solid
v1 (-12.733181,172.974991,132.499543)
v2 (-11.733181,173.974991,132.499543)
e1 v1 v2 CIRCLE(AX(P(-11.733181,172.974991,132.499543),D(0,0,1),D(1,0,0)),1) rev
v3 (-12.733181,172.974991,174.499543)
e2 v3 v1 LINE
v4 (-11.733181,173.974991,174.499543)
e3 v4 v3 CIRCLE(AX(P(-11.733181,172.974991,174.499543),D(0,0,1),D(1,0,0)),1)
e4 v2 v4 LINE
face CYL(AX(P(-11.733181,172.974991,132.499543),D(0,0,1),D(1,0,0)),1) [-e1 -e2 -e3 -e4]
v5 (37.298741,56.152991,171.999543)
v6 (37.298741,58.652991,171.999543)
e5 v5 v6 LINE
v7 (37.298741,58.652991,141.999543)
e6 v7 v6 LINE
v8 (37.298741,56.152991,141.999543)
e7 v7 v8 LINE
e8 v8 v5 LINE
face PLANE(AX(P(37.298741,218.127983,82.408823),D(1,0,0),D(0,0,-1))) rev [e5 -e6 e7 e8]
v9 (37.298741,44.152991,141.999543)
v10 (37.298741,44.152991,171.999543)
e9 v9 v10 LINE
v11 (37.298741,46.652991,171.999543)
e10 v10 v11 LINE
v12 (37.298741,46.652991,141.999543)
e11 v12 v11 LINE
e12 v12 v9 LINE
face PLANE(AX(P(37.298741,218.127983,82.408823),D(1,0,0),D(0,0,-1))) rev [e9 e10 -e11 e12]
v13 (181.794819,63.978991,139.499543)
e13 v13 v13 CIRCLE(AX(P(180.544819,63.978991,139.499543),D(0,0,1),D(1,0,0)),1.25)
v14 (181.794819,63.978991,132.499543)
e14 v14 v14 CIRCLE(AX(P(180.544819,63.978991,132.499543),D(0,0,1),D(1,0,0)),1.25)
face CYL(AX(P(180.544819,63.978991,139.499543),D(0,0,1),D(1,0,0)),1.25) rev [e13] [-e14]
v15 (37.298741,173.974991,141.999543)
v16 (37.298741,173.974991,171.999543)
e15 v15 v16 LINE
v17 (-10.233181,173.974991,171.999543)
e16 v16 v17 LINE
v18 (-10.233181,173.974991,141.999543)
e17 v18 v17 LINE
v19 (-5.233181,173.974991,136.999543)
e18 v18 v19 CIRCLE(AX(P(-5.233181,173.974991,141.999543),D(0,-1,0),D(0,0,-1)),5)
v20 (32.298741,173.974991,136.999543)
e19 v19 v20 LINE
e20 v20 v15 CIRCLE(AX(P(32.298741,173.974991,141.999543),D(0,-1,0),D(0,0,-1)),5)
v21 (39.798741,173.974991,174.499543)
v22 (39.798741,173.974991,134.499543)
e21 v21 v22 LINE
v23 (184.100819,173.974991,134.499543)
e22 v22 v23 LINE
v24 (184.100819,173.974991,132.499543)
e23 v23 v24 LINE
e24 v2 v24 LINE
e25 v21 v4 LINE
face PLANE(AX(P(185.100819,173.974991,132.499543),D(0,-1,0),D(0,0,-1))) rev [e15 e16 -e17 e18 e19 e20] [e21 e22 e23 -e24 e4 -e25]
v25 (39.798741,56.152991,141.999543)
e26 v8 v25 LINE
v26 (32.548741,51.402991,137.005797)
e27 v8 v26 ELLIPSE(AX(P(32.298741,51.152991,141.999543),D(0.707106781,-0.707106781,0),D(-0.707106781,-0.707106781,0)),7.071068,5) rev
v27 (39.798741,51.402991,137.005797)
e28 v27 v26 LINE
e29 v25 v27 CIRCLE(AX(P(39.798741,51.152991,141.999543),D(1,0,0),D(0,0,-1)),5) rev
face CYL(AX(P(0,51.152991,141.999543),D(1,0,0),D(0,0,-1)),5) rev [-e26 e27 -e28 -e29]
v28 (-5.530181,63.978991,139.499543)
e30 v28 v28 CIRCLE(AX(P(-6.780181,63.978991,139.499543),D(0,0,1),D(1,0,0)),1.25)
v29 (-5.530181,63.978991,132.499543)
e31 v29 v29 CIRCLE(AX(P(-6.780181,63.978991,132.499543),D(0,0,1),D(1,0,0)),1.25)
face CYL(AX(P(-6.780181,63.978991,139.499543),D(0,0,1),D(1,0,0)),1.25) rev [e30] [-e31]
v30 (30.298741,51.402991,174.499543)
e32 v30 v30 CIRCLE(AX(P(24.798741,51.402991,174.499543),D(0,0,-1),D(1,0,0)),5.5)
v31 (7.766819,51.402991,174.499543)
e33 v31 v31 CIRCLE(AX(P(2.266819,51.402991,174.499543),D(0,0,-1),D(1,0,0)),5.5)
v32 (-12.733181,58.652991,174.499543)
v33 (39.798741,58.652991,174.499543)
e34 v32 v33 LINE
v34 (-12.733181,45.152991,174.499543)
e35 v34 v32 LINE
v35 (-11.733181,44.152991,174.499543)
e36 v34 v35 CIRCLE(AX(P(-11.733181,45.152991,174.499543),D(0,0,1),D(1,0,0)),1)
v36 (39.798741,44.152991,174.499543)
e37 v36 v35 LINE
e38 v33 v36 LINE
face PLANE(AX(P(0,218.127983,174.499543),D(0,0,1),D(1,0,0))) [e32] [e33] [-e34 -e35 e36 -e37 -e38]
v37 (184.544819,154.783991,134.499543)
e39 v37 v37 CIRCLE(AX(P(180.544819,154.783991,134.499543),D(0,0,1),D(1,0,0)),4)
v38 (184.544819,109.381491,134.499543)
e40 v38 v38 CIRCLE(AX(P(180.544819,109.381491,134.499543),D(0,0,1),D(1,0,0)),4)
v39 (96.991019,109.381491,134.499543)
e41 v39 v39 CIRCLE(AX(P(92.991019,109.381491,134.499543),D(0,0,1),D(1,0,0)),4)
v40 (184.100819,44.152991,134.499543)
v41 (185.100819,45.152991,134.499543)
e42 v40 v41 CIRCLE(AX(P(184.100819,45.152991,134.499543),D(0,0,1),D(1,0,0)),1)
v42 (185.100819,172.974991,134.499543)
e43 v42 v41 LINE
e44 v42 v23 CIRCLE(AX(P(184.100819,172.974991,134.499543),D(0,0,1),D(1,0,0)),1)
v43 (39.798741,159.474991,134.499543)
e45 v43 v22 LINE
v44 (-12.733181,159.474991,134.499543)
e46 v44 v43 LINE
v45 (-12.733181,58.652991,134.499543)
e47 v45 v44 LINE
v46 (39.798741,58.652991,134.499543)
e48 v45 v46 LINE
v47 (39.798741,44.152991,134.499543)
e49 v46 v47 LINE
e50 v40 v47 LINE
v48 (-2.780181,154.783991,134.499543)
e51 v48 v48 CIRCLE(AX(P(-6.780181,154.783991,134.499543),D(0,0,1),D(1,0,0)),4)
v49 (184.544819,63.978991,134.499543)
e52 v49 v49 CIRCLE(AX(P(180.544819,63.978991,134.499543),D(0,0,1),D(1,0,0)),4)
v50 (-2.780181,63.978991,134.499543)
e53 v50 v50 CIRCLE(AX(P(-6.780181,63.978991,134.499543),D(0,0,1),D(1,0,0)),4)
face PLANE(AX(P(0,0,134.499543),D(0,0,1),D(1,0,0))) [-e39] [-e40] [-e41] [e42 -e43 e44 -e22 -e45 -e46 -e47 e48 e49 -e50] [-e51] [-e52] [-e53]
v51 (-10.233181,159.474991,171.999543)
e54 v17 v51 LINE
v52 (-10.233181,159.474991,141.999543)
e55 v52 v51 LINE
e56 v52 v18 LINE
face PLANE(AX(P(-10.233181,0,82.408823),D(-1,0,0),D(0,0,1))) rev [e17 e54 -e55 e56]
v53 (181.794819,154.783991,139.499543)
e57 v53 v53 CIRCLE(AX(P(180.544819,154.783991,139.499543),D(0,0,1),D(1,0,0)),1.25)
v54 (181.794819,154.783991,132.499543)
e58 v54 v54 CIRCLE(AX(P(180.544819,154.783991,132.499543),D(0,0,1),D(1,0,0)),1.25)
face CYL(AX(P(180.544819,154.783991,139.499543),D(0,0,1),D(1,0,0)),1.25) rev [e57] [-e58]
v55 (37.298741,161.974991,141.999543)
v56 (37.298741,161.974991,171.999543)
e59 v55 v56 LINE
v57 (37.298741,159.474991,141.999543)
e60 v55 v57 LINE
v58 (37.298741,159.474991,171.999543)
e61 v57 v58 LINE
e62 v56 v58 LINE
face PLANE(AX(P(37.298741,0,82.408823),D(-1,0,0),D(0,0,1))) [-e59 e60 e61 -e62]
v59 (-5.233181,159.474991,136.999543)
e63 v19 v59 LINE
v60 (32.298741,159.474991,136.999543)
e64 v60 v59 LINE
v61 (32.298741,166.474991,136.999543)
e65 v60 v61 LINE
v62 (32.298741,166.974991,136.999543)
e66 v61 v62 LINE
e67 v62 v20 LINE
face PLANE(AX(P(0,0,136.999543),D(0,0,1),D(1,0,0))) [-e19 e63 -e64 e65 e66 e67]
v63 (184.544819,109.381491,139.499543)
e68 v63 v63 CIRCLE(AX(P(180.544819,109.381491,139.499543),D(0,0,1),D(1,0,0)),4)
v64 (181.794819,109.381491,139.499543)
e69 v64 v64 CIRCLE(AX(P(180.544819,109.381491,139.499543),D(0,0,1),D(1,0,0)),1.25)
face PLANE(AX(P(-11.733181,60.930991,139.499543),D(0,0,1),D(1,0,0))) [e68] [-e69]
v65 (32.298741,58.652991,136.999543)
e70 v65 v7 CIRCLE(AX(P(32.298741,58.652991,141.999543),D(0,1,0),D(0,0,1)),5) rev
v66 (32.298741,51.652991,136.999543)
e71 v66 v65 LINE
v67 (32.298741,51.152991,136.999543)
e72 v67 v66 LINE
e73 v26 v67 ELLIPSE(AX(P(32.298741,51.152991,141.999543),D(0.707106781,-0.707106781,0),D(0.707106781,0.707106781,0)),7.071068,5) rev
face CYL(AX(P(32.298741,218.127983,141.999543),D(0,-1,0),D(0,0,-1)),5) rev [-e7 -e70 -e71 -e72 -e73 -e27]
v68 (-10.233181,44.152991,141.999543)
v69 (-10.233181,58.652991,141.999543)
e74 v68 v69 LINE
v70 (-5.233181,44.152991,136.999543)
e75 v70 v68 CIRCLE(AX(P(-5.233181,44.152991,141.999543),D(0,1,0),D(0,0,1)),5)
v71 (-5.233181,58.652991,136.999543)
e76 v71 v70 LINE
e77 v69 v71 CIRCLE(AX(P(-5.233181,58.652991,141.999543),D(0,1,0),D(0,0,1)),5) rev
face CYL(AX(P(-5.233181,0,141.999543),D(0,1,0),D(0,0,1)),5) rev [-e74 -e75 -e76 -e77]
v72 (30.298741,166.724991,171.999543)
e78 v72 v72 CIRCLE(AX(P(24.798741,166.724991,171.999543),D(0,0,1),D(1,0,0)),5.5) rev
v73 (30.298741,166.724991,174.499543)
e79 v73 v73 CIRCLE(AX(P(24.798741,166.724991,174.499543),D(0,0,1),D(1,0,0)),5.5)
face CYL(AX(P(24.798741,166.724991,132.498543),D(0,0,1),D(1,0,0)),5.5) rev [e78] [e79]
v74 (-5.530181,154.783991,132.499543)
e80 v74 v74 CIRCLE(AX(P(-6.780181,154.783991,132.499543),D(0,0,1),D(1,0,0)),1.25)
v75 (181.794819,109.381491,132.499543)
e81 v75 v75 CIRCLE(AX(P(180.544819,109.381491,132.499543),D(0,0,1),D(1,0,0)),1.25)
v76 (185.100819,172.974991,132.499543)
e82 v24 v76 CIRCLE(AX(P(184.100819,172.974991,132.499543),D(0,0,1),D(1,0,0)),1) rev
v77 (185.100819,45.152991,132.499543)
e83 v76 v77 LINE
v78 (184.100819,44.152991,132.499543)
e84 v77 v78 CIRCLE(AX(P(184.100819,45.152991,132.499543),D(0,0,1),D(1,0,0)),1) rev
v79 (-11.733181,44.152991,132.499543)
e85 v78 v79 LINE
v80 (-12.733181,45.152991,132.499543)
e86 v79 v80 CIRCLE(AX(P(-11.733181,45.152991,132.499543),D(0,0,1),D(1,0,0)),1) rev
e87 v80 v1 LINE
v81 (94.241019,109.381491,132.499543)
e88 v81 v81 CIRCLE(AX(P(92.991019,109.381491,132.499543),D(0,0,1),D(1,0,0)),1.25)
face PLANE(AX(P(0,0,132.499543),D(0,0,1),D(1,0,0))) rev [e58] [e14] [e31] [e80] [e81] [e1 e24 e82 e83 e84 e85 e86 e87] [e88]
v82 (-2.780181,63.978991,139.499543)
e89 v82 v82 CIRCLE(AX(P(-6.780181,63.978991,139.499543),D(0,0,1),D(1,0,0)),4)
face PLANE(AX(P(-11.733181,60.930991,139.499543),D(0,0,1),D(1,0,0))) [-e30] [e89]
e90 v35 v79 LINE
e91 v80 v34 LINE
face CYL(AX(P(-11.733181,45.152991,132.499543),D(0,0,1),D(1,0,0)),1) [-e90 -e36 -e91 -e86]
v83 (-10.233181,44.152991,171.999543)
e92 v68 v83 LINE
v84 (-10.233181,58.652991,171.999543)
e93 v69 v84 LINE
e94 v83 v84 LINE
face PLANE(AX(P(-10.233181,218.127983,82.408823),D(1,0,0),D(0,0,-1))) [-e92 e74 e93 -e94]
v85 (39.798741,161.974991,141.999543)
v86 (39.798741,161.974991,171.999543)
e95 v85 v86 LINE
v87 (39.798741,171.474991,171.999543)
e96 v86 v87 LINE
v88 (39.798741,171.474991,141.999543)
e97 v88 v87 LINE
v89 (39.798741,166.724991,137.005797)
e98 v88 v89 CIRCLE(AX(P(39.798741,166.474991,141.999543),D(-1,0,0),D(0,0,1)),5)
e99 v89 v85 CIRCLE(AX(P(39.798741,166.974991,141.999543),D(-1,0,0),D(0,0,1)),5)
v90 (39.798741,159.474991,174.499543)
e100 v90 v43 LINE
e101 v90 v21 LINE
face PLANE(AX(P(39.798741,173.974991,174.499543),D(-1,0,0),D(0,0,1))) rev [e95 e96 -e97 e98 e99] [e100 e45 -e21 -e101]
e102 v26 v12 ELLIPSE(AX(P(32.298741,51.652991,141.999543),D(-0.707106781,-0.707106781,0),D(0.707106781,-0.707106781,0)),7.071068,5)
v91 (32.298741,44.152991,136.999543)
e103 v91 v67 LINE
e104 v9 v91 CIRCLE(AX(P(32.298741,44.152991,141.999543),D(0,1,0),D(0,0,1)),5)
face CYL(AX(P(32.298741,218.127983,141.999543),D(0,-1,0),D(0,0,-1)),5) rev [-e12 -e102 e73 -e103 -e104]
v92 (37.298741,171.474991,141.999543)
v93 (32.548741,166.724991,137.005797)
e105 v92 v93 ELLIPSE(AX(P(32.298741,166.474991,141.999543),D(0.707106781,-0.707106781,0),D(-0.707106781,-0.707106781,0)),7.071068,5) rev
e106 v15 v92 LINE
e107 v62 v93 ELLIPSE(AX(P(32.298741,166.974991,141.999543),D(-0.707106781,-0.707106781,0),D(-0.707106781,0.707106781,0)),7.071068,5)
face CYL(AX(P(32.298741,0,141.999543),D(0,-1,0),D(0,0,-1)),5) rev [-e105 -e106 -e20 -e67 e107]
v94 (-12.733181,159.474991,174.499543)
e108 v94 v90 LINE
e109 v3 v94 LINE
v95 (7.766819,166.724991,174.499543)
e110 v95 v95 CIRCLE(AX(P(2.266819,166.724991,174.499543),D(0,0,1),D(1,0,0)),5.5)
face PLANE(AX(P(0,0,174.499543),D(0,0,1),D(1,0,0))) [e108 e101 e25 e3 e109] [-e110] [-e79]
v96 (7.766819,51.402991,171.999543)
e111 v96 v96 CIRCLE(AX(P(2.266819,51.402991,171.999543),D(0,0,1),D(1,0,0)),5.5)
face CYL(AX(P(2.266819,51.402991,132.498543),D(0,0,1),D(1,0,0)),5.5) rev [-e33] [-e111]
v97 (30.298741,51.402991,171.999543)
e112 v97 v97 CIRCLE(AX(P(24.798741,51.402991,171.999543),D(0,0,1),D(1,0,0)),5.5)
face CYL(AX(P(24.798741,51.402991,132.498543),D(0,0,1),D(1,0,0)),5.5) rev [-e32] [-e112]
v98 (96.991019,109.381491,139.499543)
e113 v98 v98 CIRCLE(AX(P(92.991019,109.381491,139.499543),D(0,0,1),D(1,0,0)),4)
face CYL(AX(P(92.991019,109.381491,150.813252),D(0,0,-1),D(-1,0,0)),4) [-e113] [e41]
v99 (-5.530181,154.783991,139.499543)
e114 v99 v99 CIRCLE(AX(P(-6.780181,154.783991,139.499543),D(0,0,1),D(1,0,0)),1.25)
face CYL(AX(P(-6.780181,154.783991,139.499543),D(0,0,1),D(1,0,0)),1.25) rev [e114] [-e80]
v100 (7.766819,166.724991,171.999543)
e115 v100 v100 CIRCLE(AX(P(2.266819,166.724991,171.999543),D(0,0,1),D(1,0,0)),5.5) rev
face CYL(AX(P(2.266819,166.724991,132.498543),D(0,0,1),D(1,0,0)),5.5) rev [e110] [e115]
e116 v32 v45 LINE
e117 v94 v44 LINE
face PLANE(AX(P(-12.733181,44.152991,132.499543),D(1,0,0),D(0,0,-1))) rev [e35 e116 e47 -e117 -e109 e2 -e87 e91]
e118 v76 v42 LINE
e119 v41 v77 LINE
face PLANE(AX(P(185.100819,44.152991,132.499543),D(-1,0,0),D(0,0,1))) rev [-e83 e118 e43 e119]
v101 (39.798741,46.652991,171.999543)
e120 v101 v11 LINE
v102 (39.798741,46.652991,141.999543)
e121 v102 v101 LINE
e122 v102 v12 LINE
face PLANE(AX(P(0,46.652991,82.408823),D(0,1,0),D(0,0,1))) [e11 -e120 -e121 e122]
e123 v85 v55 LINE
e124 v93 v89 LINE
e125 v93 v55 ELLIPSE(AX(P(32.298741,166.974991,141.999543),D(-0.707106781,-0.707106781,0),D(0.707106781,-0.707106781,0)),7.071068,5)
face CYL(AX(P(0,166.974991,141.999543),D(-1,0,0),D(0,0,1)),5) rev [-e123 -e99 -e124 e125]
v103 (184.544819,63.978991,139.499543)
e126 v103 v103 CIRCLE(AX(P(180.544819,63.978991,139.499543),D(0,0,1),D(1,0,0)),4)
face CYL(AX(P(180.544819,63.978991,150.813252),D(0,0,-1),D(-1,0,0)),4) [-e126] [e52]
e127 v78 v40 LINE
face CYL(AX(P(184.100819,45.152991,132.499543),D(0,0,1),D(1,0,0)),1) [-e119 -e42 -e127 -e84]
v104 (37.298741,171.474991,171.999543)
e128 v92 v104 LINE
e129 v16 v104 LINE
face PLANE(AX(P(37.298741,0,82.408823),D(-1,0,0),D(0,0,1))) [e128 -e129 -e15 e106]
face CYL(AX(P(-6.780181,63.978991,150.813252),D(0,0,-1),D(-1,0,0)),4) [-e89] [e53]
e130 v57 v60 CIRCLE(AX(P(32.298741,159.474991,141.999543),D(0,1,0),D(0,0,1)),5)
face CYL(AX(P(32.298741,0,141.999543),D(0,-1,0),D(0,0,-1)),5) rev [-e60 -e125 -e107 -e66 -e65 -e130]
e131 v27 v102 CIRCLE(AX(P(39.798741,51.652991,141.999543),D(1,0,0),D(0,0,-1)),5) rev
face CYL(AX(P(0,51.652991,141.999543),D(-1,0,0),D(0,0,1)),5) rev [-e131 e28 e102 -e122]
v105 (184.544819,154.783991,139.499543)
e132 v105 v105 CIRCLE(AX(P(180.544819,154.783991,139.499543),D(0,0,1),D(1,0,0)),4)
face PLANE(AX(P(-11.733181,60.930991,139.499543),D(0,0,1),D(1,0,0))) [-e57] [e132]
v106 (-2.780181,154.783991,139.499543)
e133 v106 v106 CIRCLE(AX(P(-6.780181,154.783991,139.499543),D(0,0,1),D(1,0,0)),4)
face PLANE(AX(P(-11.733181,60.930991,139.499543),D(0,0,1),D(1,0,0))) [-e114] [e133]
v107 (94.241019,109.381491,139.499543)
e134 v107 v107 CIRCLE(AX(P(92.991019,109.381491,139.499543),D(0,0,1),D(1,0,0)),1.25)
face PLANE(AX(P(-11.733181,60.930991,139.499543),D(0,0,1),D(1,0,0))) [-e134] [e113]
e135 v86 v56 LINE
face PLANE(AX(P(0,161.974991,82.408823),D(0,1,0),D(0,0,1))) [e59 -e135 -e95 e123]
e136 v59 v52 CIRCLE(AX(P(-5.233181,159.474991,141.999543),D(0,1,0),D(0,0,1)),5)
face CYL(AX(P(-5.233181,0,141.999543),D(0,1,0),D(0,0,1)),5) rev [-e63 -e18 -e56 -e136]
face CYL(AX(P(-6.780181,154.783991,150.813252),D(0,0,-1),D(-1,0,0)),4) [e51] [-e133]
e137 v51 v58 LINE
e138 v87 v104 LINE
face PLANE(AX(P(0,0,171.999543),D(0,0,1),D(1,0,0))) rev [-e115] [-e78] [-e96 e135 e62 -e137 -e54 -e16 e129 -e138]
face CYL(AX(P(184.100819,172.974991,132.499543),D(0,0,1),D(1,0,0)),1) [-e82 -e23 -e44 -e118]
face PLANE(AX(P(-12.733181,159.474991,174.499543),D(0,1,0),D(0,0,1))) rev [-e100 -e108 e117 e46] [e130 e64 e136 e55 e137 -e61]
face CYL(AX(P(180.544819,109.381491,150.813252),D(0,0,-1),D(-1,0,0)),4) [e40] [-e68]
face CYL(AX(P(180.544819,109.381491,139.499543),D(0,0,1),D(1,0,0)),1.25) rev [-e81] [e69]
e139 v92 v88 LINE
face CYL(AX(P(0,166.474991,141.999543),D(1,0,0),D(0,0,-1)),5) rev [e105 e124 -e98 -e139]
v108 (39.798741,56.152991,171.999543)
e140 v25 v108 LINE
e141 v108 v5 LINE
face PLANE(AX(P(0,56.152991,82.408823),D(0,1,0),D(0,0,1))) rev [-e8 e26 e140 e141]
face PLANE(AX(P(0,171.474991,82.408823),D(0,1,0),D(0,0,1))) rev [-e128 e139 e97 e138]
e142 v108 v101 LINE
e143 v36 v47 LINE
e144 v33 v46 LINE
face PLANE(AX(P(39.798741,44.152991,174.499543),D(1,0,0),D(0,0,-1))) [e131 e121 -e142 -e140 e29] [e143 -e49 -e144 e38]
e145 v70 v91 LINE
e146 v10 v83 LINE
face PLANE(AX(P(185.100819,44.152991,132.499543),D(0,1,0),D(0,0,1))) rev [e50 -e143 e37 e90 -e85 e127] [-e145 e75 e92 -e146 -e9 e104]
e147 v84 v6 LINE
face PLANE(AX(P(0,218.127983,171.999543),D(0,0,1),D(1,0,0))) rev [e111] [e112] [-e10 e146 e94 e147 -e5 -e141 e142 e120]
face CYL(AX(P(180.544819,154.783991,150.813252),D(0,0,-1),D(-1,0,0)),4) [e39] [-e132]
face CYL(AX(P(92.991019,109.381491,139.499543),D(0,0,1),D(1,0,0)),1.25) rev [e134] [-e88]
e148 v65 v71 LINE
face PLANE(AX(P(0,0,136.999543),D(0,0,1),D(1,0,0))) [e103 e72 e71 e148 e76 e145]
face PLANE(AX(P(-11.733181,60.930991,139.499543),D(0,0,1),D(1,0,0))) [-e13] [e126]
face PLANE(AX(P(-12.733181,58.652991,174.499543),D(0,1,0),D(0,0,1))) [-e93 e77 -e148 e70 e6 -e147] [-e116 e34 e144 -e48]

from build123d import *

# Parameters (mm, degrees)
SKETCH2_W                   = 197.834
SKETCH2_H                   = 129.822
BOSS_EXTRUDE1_DEPTH         = 2
SKETCH3_R                   = 4
BOSS_EXTRUDE2_DEPTH         = 5
TAP_DRILL_FOR_M3X0_5_TAP1_D = 2.5
SKETCH9_W                   = 52.531921718
SKETCH9_H                   = 14.5
BOSS_EXTRUDE3_DEPTH         = 40
CUT_EXTRUDE1_START          = -2.5
SKETCH11_W                  = 47.531921718
SKETCH11_H                  = 9.5
SKETCH11_H_2                = 2.5
SKETCH11_W_2                = 2.5
CUT_EXTRUDE1_DEPTH          = 35
CUT_EXTRUDE2_REACH          = 259.475
SKETCH12_R                  = 5.5
FILLET1_R                   = 5
FILLET1_OF_MIRROR1_R        = 5
FILLET2_R                   = 1


with BuildPart() as part:
    # Sketch2 → Boss-Extrude1 (new body)
    with BuildSketch(Plane(origin=(0, 0, 134.499543387), x_dir=(-1, 0, 0), z_dir=(0, 0, -1))):
        with Locations((-86.183818981, 109.06399149)):
            Rectangle(SKETCH2_W, SKETCH2_H)
    extrude(amount=BOSS_EXTRUDE1_DEPTH)

    # Sketch3 → Boss-Extrude2 (add)
    with BuildSketch(Plane.XY.offset(134.499543387)):
        with Locations((180.544818981, 154.78399149)):
            Circle(SKETCH3_R)
        with Locations((180.544818981, 109.38149149)):
            Circle(SKETCH3_R)
        with Locations((180.544818981, 63.97899149)):
            Circle(SKETCH3_R)
        with Locations((92.991018981, 109.38149149)):
            Circle(SKETCH3_R)
        with Locations((-6.780181019, 154.78399149)):
            Circle(SKETCH3_R)
        with Locations((-6.780181019, 63.97899149)):
            Circle(SKETCH3_R)
    extrude(amount=BOSS_EXTRUDE2_DEPTH)

    # Tap Drill for M3x0.5 Tap1 (through all)
    with Locations(Plane.XY.offset(139.499543387)):
        with Locations((180.544818981, 154.78399149), (180.544818981, 109.38149149), (180.544818981, 63.97899149), (92.991018981, 109.38149149), (-6.780181019, 63.97899149), (-6.780181019, 154.78399149)):
            Hole(TAP_DRILL_FOR_M3X0_5_TAP1_D / 2)

    # Sketch9 → Boss-Extrude3 (add)
    with BuildSketch(Plane.XY.offset(134.499543387)):
        with Locations((13.53277984, 166.72499149)):
            Rectangle(SKETCH9_W, SKETCH9_H)
    boss_extrude3 = extrude(amount=BOSS_EXTRUDE3_DEPTH)

    # Sketch11 → Cut-Extrude1 (cut)
    with BuildSketch(Plane.XY.offset(174.499543387).offset(CUT_EXTRUDE1_START)):
        with Locations((13.53277984, 166.72499149)):
            Rectangle(SKETCH11_W, SKETCH11_H)
        with Locations((13.53277984, 160.72499149)):
            Rectangle(SKETCH11_W, SKETCH11_H_2)
        with Locations((13.53277984, 172.72499149)):
            Rectangle(SKETCH11_W, SKETCH11_H_2)
        with Locations((38.548740699, 166.72499149)):
            Rectangle(SKETCH11_W_2, SKETCH11_H)
    cut_extrude1 = extrude(amount=-CUT_EXTRUDE1_DEPTH, mode=Mode.SUBTRACT)

    # Sketch12 → Cut-Extrude2 (cut, up to next)
    with BuildSketch(Plane.XY.offset(174.499543387), mode=Mode.PRIVATE) as cut_extrude2_sk1:
        with Locations((2.266818981, 166.72499149)):
            Circle(SKETCH12_R)
    cut_extrude2_tool1 = extrude(cut_extrude2_sk1.sketch, amount=-CUT_EXTRUDE2_REACH, mode=Mode.PRIVATE) & part.part
    # Sketch12 → Cut-Extrude2 (cut, up to next)
    with BuildSketch(Plane.XY.offset(174.499543387), mode=Mode.PRIVATE) as cut_extrude2_sk2:
        with Locations((24.798740699, 166.72499149)):
            Circle(SKETCH12_R)
    cut_extrude2_tool2 = extrude(cut_extrude2_sk2.sketch, amount=-CUT_EXTRUDE2_REACH, mode=Mode.PRIVATE) & part.part
    cut_extrude2_1 = cut_extrude2_tool1.solids().sort_by_distance((2.266819, 166.724991, 174.499543))[0]
    add(cut_extrude2_1, mode=Mode.SUBTRACT)
    cut_extrude2_2 = cut_extrude2_tool2.solids().sort_by_distance((24.798741, 166.724991, 174.499543))[0]
    add(cut_extrude2_2, mode=Mode.SUBTRACT)
    cut_extrude2 = cut_extrude2_1 + cut_extrude2_2  # Cut-Extrude2 as one shape, for the pattern or mirror that repeats it

    # Fillet1
    # the kernel refuses this fillet: 5 mm, written as the material it adds along each edge
    with BuildSketch(Plane(origin=(-10.233181019, 159.47499149, 136.999543387), x_dir=(0, 0, 1), z_dir=(0, 1, 0))) as fillet1_piece_1:
        with BuildLine():
            CenterArc((FILLET1_R, FILLET1_R), FILLET1_R, 180, 90)
            Line((0, FILLET1_R), (-FILLET1_R * 0.02, FILLET1_R))
            Line((-FILLET1_R * 0.02, FILLET1_R), (-FILLET1_R * 0.02, -FILLET1_R * 0.02))
            Line((-FILLET1_R * 0.02, -FILLET1_R * 0.02), (FILLET1_R, -FILLET1_R * 0.02))
            Line((FILLET1_R, -FILLET1_R * 0.02), (FILLET1_R, 0))
        make_face()
    extrude(amount=14.5)
    with BuildSketch(Plane(origin=(39.798740699, 171.47499149, 136.999543387), x_dir=(0, -1, 0), z_dir=(-1, 0, 0)), Plane(origin=(37.298740699, 171.47499149, 136.999543387), x_dir=(-1, 0, 0), z_dir=(0, 1, 0)), Plane(origin=(37.298740699, 161.97499149, 136.999543387), x_dir=(0, 1, 0), z_dir=(1, 0, 0)), Plane(origin=(37.298740699, 159.47499149, 136.999543387), x_dir=(-1, 0, 0), z_dir=(0, 1, 0))) as fillet1_piece_2:
        with BuildLine():
            CenterArc((FILLET1_R, FILLET1_R), FILLET1_R, 180, 90)
            Line((0, FILLET1_R), (-FILLET1_R * 0.02, FILLET1_R))
            Line((-FILLET1_R * 0.02, FILLET1_R), (-FILLET1_R * 0.02, -FILLET1_R * 0.02))
            Line((-FILLET1_R * 0.02, -FILLET1_R * 0.02), (FILLET1_R, -FILLET1_R * 0.02))
            Line((FILLET1_R, -FILLET1_R * 0.02), (FILLET1_R, 0))
        make_face()
    extrude(amount=2.5)
    with BuildSketch(Plane(origin=(39.798740699, 171.47499149, 136.999543387), x_dir=(0, -1, 0), z_dir=(-1, 0, 0))) as fillet1_piece_3a_section:
        with BuildLine():
            CenterArc((FILLET1_R, FILLET1_R), FILLET1_R, 180, 90)
            Line((0, FILLET1_R), (-FILLET1_R * 0.02, FILLET1_R))
            Line((-FILLET1_R * 0.02, FILLET1_R), (-FILLET1_R * 0.02, -FILLET1_R * 0.02))
            Line((-FILLET1_R * 0.02, -FILLET1_R * 0.02), (FILLET1_R, -FILLET1_R * 0.02))
            Line((FILLET1_R, -FILLET1_R * 0.02), (FILLET1_R, 0))
        make_face()
    fillet1_piece_3a = extrude(amount=15, mode=Mode.PRIVATE)
    fillet1_piece_3a = split(fillet1_piece_3a, bisect_by=Plane(origin=(37.298740699, 170.343015918, 138.131518958), z_dir=(-1, 0, 0)), keep=Keep.TOP, mode=Mode.PRIVATE)
    with BuildSketch(Plane(origin=(37.298740699, 158.97499149, 136.999543387), x_dir=(-1, 0, 0), z_dir=(0, 1, 0))) as fillet1_piece_3b_section:
        with BuildLine():
            CenterArc((FILLET1_R, FILLET1_R), FILLET1_R, 180, 90)
            Line((0, FILLET1_R), (-FILLET1_R * 0.02, FILLET1_R))
            Line((-FILLET1_R * 0.02, FILLET1_R), (-FILLET1_R * 0.02, -FILLET1_R * 0.02))
            Line((-FILLET1_R * 0.02, -FILLET1_R * 0.02), (FILLET1_R, -FILLET1_R * 0.02))
            Line((FILLET1_R, -FILLET1_R * 0.02), (FILLET1_R, 0))
        make_face()
    fillet1_piece_3b = extrude(amount=15, mode=Mode.PRIVATE)
    fillet1_piece_3b = split(fillet1_piece_3b, bisect_by=Plane(origin=(36.166765127, 171.47499149, 138.131518958), z_dir=(0, -1, 0)), keep=Keep.TOP, mode=Mode.PRIVATE)
    fillet1_piece_3 = fillet1_piece_3a & fillet1_piece_3b
    add(fillet1_piece_3)
    with BuildSketch(Plane(origin=(37.298740699, 159.47499149, 136.999543387), x_dir=(-1, 0, 0), z_dir=(0, 1, 0))) as fillet1_piece_4a_section:
        with BuildLine():
            CenterArc((FILLET1_R, FILLET1_R), FILLET1_R, 180, 90)
            Line((0, FILLET1_R), (-FILLET1_R * 0.02, FILLET1_R))
            Line((-FILLET1_R * 0.02, FILLET1_R), (-FILLET1_R * 0.02, -FILLET1_R * 0.02))
            Line((-FILLET1_R * 0.02, -FILLET1_R * 0.02), (FILLET1_R, -FILLET1_R * 0.02))
            Line((FILLET1_R, -FILLET1_R * 0.02), (FILLET1_R, 0))
        make_face()
    fillet1_piece_4a = extrude(amount=15, mode=Mode.PRIVATE)
    fillet1_piece_4a = split(fillet1_piece_4a, bisect_by=Plane(origin=(36.166765127, 161.97499149, 138.131518958), z_dir=(0, 1, 0)), keep=Keep.TOP, mode=Mode.PRIVATE)
    with BuildSketch(Plane(origin=(24.798740699, 161.97499149, 136.999543387), x_dir=(0, 1, 0), z_dir=(1, 0, 0))) as fillet1_piece_4b_section:
        with BuildLine():
            CenterArc((FILLET1_R, FILLET1_R), FILLET1_R, 180, 90)
            Line((0, FILLET1_R), (-FILLET1_R * 0.02, FILLET1_R))
            Line((-FILLET1_R * 0.02, FILLET1_R), (-FILLET1_R * 0.02, -FILLET1_R * 0.02))
            Line((-FILLET1_R * 0.02, -FILLET1_R * 0.02), (FILLET1_R, -FILLET1_R * 0.02))
            Line((FILLET1_R, -FILLET1_R * 0.02), (FILLET1_R, 0))
        make_face()
    fillet1_piece_4b = extrude(amount=15, mode=Mode.PRIVATE)
    fillet1_piece_4b = split(fillet1_piece_4b, bisect_by=Plane(origin=(37.298740699, 163.106967061, 138.131518958), z_dir=(-1, 0, 0)), keep=Keep.TOP, mode=Mode.PRIVATE)
    fillet1_piece_4 = fillet1_piece_4a & fillet1_piece_4b
    add(fillet1_piece_4)

    # Mirror1: Boss-Extrude3, Cut-Extrude1, Cut-Extrude2 across plane
    add(boss_extrude3.mirror(Plane.ZX.offset(109.06399149)))
    add(cut_extrude1.mirror(Plane.ZX.offset(109.06399149)), mode=Mode.SUBTRACT)
    add(cut_extrude2.mirror(Plane.ZX.offset(109.06399149)), mode=Mode.SUBTRACT)

    # Fillet1 of Mirror1
    # the kernel refuses this fillet: 5 mm, written as the material it adds along each edge
    with BuildSketch(Plane(origin=(-10.233181019, 58.65299149, 136.999543387), x_dir=(1, 0, 0), z_dir=(0, -1, 0))) as fillet1_of_mirror1_piece_1:
        with BuildLine():
            CenterArc((FILLET1_OF_MIRROR1_R, FILLET1_OF_MIRROR1_R), FILLET1_OF_MIRROR1_R, 180, 90)
            Line((0, FILLET1_OF_MIRROR1_R), (-FILLET1_OF_MIRROR1_R * 0.02, FILLET1_OF_MIRROR1_R))
            Line((-FILLET1_OF_MIRROR1_R * 0.02, FILLET1_OF_MIRROR1_R), (-FILLET1_OF_MIRROR1_R * 0.02, -FILLET1_OF_MIRROR1_R * 0.02))
            Line((-FILLET1_OF_MIRROR1_R * 0.02, -FILLET1_OF_MIRROR1_R * 0.02), (FILLET1_OF_MIRROR1_R, -FILLET1_OF_MIRROR1_R * 0.02))
            Line((FILLET1_OF_MIRROR1_R, -FILLET1_OF_MIRROR1_R * 0.02), (FILLET1_OF_MIRROR1_R, 0))
        make_face()
    extrude(amount=14.5)
    with BuildSketch(Plane(origin=(39.798740699, 46.65299149, 136.999543387), x_dir=(0, 1, 0), z_dir=(-1, 0, 0)), Plane(origin=(37.298740699, 56.15299149, 136.999543387), x_dir=(0, -1, 0), z_dir=(1, 0, 0)), Plane(origin=(37.298740699, 58.65299149, 136.999543387), x_dir=(-1, 0, 0), z_dir=(0, -1, 0))) as fillet1_of_mirror1_piece_2:
        with BuildLine():
            CenterArc((FILLET1_OF_MIRROR1_R, -FILLET1_OF_MIRROR1_R), FILLET1_OF_MIRROR1_R, 90, 90)
            Line((0, -FILLET1_OF_MIRROR1_R), (-FILLET1_OF_MIRROR1_R * 0.02, -FILLET1_OF_MIRROR1_R))
            Line((-FILLET1_OF_MIRROR1_R * 0.02, -FILLET1_OF_MIRROR1_R), (-FILLET1_OF_MIRROR1_R * 0.02, FILLET1_OF_MIRROR1_R * 0.02))
            Line((-FILLET1_OF_MIRROR1_R * 0.02, FILLET1_OF_MIRROR1_R * 0.02), (FILLET1_OF_MIRROR1_R, FILLET1_OF_MIRROR1_R * 0.02))
            Line((FILLET1_OF_MIRROR1_R, FILLET1_OF_MIRROR1_R * 0.02), (FILLET1_OF_MIRROR1_R, 0))
        make_face()
    extrude(amount=2.5)
    with BuildSketch(Plane(origin=(37.298740699, 46.65299149, 136.999543387), x_dir=(0, 0, 1), z_dir=(0, -1, 0))) as fillet1_of_mirror1_piece_3:
        with BuildLine():
            CenterArc((FILLET1_OF_MIRROR1_R, FILLET1_OF_MIRROR1_R), FILLET1_OF_MIRROR1_R, 180, 90)
            Line((0, FILLET1_OF_MIRROR1_R), (-FILLET1_OF_MIRROR1_R * 0.02, FILLET1_OF_MIRROR1_R))
            Line((-FILLET1_OF_MIRROR1_R * 0.02, FILLET1_OF_MIRROR1_R), (-FILLET1_OF_MIRROR1_R * 0.02, -FILLET1_OF_MIRROR1_R * 0.02))
            Line((-FILLET1_OF_MIRROR1_R * 0.02, -FILLET1_OF_MIRROR1_R * 0.02), (FILLET1_OF_MIRROR1_R, -FILLET1_OF_MIRROR1_R * 0.02))
            Line((FILLET1_OF_MIRROR1_R, -FILLET1_OF_MIRROR1_R * 0.02), (FILLET1_OF_MIRROR1_R, 0))
        make_face()
    extrude(amount=2.5)
    with BuildSketch(Plane(origin=(37.298740699, 59.15299149, 136.999543387), x_dir=(0, 0, 1), z_dir=(0, -1, 0))) as fillet1_of_mirror1_piece_4a_section:
        with BuildLine():
            CenterArc((FILLET1_OF_MIRROR1_R, FILLET1_OF_MIRROR1_R), FILLET1_OF_MIRROR1_R, 180, 90)
            Line((0, FILLET1_OF_MIRROR1_R), (-FILLET1_OF_MIRROR1_R * 0.02, FILLET1_OF_MIRROR1_R))
            Line((-FILLET1_OF_MIRROR1_R * 0.02, FILLET1_OF_MIRROR1_R), (-FILLET1_OF_MIRROR1_R * 0.02, -FILLET1_OF_MIRROR1_R * 0.02))
            Line((-FILLET1_OF_MIRROR1_R * 0.02, -FILLET1_OF_MIRROR1_R * 0.02), (FILLET1_OF_MIRROR1_R, -FILLET1_OF_MIRROR1_R * 0.02))
            Line((FILLET1_OF_MIRROR1_R, -FILLET1_OF_MIRROR1_R * 0.02), (FILLET1_OF_MIRROR1_R, 0))
        make_face()
    fillet1_of_mirror1_piece_4a = extrude(amount=15, mode=Mode.PRIVATE)
    fillet1_of_mirror1_piece_4a = split(fillet1_of_mirror1_piece_4a, bisect_by=Plane(origin=(36.166765127, 46.65299149, 138.131518958), z_dir=(0, 1, 0)), keep=Keep.TOP, mode=Mode.PRIVATE)
    with BuildSketch(Plane(origin=(39.798740699, 46.65299149, 136.999543387), x_dir=(0, 1, 0), z_dir=(-1, 0, 0))) as fillet1_of_mirror1_piece_4b_section:
        with BuildLine():
            CenterArc((FILLET1_OF_MIRROR1_R, -FILLET1_OF_MIRROR1_R), FILLET1_OF_MIRROR1_R, 90, 90)
            Line((0, -FILLET1_OF_MIRROR1_R), (-FILLET1_OF_MIRROR1_R * 0.02, -FILLET1_OF_MIRROR1_R))
            Line((-FILLET1_OF_MIRROR1_R * 0.02, -FILLET1_OF_MIRROR1_R), (-FILLET1_OF_MIRROR1_R * 0.02, FILLET1_OF_MIRROR1_R * 0.02))
            Line((-FILLET1_OF_MIRROR1_R * 0.02, FILLET1_OF_MIRROR1_R * 0.02), (FILLET1_OF_MIRROR1_R, FILLET1_OF_MIRROR1_R * 0.02))
            Line((FILLET1_OF_MIRROR1_R, FILLET1_OF_MIRROR1_R * 0.02), (FILLET1_OF_MIRROR1_R, 0))
        make_face()
    fillet1_of_mirror1_piece_4b = extrude(amount=15, mode=Mode.PRIVATE)
    fillet1_of_mirror1_piece_4b = split(fillet1_of_mirror1_piece_4b, bisect_by=Plane(origin=(37.298740699, 47.784967061, 138.131518958), z_dir=(-1, 0, 0)), keep=Keep.TOP, mode=Mode.PRIVATE)
    fillet1_of_mirror1_piece_4 = fillet1_of_mirror1_piece_4a & fillet1_of_mirror1_piece_4b
    add(fillet1_of_mirror1_piece_4)
    with BuildSketch(Plane(origin=(37.298740699, 58.65299149, 136.999543387), x_dir=(-1, 0, 0), z_dir=(0, -1, 0))) as fillet1_of_mirror1_piece_5a_section:
        with BuildLine():
            CenterArc((FILLET1_OF_MIRROR1_R, -FILLET1_OF_MIRROR1_R), FILLET1_OF_MIRROR1_R, 90, 90)
            Line((0, -FILLET1_OF_MIRROR1_R), (-FILLET1_OF_MIRROR1_R * 0.02, -FILLET1_OF_MIRROR1_R))
            Line((-FILLET1_OF_MIRROR1_R * 0.02, -FILLET1_OF_MIRROR1_R), (-FILLET1_OF_MIRROR1_R * 0.02, FILLET1_OF_MIRROR1_R * 0.02))
            Line((-FILLET1_OF_MIRROR1_R * 0.02, FILLET1_OF_MIRROR1_R * 0.02), (FILLET1_OF_MIRROR1_R, FILLET1_OF_MIRROR1_R * 0.02))
            Line((FILLET1_OF_MIRROR1_R, FILLET1_OF_MIRROR1_R * 0.02), (FILLET1_OF_MIRROR1_R, 0))
        make_face()
    fillet1_of_mirror1_piece_5a = extrude(amount=15, mode=Mode.PRIVATE)
    fillet1_of_mirror1_piece_5a = split(fillet1_of_mirror1_piece_5a, bisect_by=Plane(origin=(36.166765127, 56.15299149, 138.131518958), z_dir=(0, -1, 0)), keep=Keep.TOP, mode=Mode.PRIVATE)
    with BuildSketch(Plane(origin=(24.798740699, 56.15299149, 136.999543387), x_dir=(0, -1, 0), z_dir=(1, 0, 0))) as fillet1_of_mirror1_piece_5b_section:
        with BuildLine():
            CenterArc((FILLET1_OF_MIRROR1_R, -FILLET1_OF_MIRROR1_R), FILLET1_OF_MIRROR1_R, 90, 90)
            Line((0, -FILLET1_OF_MIRROR1_R), (-FILLET1_OF_MIRROR1_R * 0.02, -FILLET1_OF_MIRROR1_R))
            Line((-FILLET1_OF_MIRROR1_R * 0.02, -FILLET1_OF_MIRROR1_R), (-FILLET1_OF_MIRROR1_R * 0.02, FILLET1_OF_MIRROR1_R * 0.02))
            Line((-FILLET1_OF_MIRROR1_R * 0.02, FILLET1_OF_MIRROR1_R * 0.02), (FILLET1_OF_MIRROR1_R, FILLET1_OF_MIRROR1_R * 0.02))
            Line((FILLET1_OF_MIRROR1_R, FILLET1_OF_MIRROR1_R * 0.02), (FILLET1_OF_MIRROR1_R, 0))
        make_face()
    fillet1_of_mirror1_piece_5b = extrude(amount=15, mode=Mode.PRIVATE)
    fillet1_of_mirror1_piece_5b = split(fillet1_of_mirror1_piece_5b, bisect_by=Plane(origin=(37.298740699, 55.021015918, 138.131518958), z_dir=(-1, 0, 0)), keep=Keep.TOP, mode=Mode.PRIVATE)
    fillet1_of_mirror1_piece_5 = fillet1_of_mirror1_piece_5a & fillet1_of_mirror1_piece_5b
    add(fillet1_of_mirror1_piece_5)

    # Fillet2
    fillet2_edges = [part.edges().sort_by_distance(p)[0] for p in [
        (185.100818981, 173.97499149, 133.499543387),
        (-12.733181019, 173.97499149, 153.499543387),
        (-12.733181019, 44.15299149, 153.499543387),
        (185.100818981, 44.15299149, 133.499543387),
    ]]
    fillet(fillet2_edges, radius=FILLET2_R)


solid = part.part
